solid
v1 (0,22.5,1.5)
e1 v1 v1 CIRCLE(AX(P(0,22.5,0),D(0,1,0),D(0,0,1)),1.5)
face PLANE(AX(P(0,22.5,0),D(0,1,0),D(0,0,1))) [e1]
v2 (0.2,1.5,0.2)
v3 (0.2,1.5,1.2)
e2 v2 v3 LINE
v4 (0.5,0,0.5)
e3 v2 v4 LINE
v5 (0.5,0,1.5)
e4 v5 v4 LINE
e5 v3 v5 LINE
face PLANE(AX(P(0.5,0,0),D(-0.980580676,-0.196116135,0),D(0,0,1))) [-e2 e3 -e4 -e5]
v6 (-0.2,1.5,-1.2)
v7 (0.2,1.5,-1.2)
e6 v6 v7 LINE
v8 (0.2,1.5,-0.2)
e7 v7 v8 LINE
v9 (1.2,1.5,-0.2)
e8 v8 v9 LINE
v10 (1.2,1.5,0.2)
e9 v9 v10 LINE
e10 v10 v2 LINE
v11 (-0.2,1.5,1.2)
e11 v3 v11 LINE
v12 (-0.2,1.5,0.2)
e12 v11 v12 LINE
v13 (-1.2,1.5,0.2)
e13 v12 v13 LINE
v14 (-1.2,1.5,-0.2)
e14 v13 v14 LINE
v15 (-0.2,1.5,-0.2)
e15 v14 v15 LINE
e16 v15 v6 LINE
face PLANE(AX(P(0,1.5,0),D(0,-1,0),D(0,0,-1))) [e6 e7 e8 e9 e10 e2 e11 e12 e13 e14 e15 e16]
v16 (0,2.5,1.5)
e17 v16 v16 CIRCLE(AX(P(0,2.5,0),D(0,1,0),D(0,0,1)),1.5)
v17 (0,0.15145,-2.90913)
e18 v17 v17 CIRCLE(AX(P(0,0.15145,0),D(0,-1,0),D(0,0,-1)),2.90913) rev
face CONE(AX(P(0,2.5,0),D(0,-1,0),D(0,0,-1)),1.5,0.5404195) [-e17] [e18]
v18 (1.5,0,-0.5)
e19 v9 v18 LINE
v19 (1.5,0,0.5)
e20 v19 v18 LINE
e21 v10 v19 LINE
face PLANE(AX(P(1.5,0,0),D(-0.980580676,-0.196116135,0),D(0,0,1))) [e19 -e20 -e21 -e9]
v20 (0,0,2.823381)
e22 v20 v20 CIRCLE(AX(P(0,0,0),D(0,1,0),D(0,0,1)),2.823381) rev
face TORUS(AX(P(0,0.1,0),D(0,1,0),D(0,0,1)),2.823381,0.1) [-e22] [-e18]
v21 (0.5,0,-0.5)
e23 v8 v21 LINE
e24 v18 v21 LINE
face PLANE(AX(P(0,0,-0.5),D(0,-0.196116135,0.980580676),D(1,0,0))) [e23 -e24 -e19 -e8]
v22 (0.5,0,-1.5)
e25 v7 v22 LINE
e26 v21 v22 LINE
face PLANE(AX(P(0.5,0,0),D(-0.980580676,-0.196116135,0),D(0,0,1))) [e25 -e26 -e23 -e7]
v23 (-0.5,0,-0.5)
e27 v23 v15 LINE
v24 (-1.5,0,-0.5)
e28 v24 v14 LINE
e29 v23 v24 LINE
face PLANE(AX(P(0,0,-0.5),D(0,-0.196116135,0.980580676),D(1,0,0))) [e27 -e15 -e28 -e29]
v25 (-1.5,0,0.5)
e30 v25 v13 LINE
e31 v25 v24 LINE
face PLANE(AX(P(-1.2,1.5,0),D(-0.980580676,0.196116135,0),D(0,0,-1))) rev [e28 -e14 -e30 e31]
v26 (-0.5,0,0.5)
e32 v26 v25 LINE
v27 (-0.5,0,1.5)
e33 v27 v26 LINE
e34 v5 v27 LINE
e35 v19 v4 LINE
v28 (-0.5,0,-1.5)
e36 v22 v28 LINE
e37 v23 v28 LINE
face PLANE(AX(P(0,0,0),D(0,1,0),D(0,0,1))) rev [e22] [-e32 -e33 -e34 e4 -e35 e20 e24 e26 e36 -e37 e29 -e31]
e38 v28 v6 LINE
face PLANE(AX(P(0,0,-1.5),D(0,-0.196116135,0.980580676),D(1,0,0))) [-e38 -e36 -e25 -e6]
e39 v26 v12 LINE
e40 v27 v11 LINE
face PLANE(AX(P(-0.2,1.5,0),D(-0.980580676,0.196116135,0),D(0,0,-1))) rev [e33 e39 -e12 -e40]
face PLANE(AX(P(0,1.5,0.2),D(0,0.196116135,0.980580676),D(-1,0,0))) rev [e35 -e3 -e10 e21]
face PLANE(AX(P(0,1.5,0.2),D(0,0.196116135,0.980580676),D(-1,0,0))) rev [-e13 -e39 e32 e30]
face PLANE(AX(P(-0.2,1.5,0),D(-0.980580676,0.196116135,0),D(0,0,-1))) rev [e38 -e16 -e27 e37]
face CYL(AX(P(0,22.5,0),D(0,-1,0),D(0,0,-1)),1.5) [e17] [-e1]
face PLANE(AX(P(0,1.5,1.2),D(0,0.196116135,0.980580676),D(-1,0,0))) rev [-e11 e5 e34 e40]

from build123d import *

# Parameters (mm, degrees)
SKETCH1_R           = 3
BOSS_EXTRUDE1_DEPTH = 2.5
SKETCH2_R           = 1.5
BOSS_EXTRUDE2_DEPTH = 20
CHAMFER1_SIZE       = 2.5
CHAMFER1_SIZE_2     = 1.5
FILLET1_R           = 0.1
SKETCH3_W           = 1
SKETCH3_H           = 1
CUT_EXTRUDE2_DEPTH  = 1.5
CHAMFER7_SIZE       = 1.5
CHAMFER7_SIZE_2     = 0.3


with BuildPart() as part:
    # Sketch1 → Boss-Extrude1 (new body)
    with BuildSketch(Plane(origin=(0, 0, 0), x_dir=(1, 0, 0), z_dir=(0, 1, 0))):
        with Locations(Location((0, 0, 0), (0, 0, 270))):
            Circle(SKETCH1_R)
    extrude(amount=BOSS_EXTRUDE1_DEPTH)

    # Sketch2 → Boss-Extrude2 (add)
    with BuildSketch(Plane(origin=(0, 2.5, 0), x_dir=(1, 0, 0), z_dir=(0, 1, 0))):
        with Locations(Location((0, 0, 0), (0, 0, 270))):
            Circle(SKETCH2_R)
    extrude(amount=BOSS_EXTRUDE2_DEPTH)

    # Chamfer1
    # the kernel refuses this chamfer: 2.5, 1.5 mm, written as the material it takes off along each edge
    with BuildSketch(Plane(origin=(0, 2.5, 0), x_dir=(0, 0, 1), z_dir=(-1, 0, 0))) as chamfer1_piece_1_section:
        Polygon((3, -CHAMFER1_SIZE), (3 - CHAMFER1_SIZE_2, 0), (3, 0), align=None)
    chamfer1_piece_1 = revolve(axis=Axis((0, 2.5, 0), (0, 1, 0)), mode=Mode.PRIVATE)
    chamfer1_piece_1 = chamfer1_piece_1 - Plane(origin=(0, 2.5, 0), x_dir=(0, 0, 1), z_dir=(0, -1, 0)) * Cylinder(1.5, 12, mode=Mode.PRIVATE)
    add(chamfer1_piece_1, mode=Mode.SUBTRACT)

    # Fillet1
    fillet1_edges = [part.edges().sort_by_distance(p)[0] for p in [
        (0, 0, -3),
    ]]
    fillet(fillet1_edges, radius=FILLET1_R)

    # Sketch3 → Cut-Extrude2 (cut)
    with BuildSketch(Plane.XZ):
        with Locations((0, -1)):
            Rectangle(SKETCH3_W, SKETCH3_H)
        with Locations((-1, 0)):
            Rectangle(SKETCH3_W, SKETCH3_H)
        Rectangle(SKETCH3_W, SKETCH3_H)
        with Locations((0, 1)):
            Rectangle(SKETCH3_W, SKETCH3_H)
        with Locations((1, 0)):
            Rectangle(SKETCH3_W, SKETCH3_H)
    extrude(amount=-CUT_EXTRUDE2_DEPTH, mode=Mode.SUBTRACT)

    # Chamfer7
    # the kernel refuses this chamfer: 1.5, 0.3 mm, written as the material it adds along each edge
    with BuildSketch(Plane(origin=(-0.5, 1.5, -1.5), x_dir=(0, -1, 0), z_dir=(1, 0, 0)), Plane(origin=(0.5, 1.5, 1.5), x_dir=(0, -1, 0), z_dir=(-1, 0, 0)), Plane(origin=(1.5, 1.5, 0.5), x_dir=(0, -1, 0), z_dir=(-1, 0, 0)), Plane(origin=(-0.5, 1.5, 1.5), x_dir=(0, -1, 0), z_dir=(0, 0, -1)), Plane(origin=(-1.5, 1.5, 0.5), x_dir=(0, -1, 0), z_dir=(0, 0, -1)), Plane(origin=(1.5, 1.5, -0.5), x_dir=(0, -1, 0), z_dir=(0, 0, 1)), Plane(origin=(0.5, 1.5, -0.5), x_dir=(0, -1, 0), z_dir=(1, 0, 0)), Plane(origin=(-1.5, 1.5, -0.5), x_dir=(0, -1, 0), z_dir=(1, 0, 0)), Plane(origin=(-0.5, 1.5, -0.5), x_dir=(0, -1, 0), z_dir=(0, 0, -1))) as chamfer7_piece_1:
        Polygon((CHAMFER7_SIZE, 0), (0, -CHAMFER7_SIZE_2), (0, 0), align=None)
    extrude(amount=1)
    with BuildSketch(Plane(origin=(0.5, 1.5, 1.5), x_dir=(0, -1, 0), z_dir=(0, 0, -1)), Plane(origin=(-1.5, 1.5, 0.5), x_dir=(0, -1, 0), z_dir=(1, 0, 0)), Plane(origin=(0.5, 1.5, -0.5), x_dir=(0, -1, 0), z_dir=(0, 0, -1))) as chamfer7_piece_2:
        Polygon((CHAMFER7_SIZE, 0), (0, CHAMFER7_SIZE_2), (0, 0), align=None)
    extrude(amount=1)
    with BuildSketch(Plane(origin=(0.5, 1.5, 5.397198129), x_dir=(0, -1, 0), z_dir=(0, 0, -1))) as chamfer7_piece_3_section:
        Polygon((CHAMFER7_SIZE, 0), (0, CHAMFER7_SIZE_2), (0, 0), align=None)
    chamfer7_piece_3 = extrude(amount=8.794396259, mode=Mode.PRIVATE)
    chamfer7_piece_3 = split(chamfer7_piece_3, bisect_by=Plane(origin=(0.5, 1.5, -0.5), z_dir=(0, 0, -1)), keep=Keep.TOP, mode=Mode.PRIVATE)
    chamfer7_piece_3 = split(chamfer7_piece_3, bisect_by=Plane(origin=(0.5, 1.5, -1.5), z_dir=(0, 0, 1)), keep=Keep.TOP, mode=Mode.PRIVATE)
    add(chamfer7_piece_3)
    with BuildSketch(Plane(origin=(5.397198129, 1.5, 0.5), x_dir=(0, -1, 0), z_dir=(-1, 0, 0))) as chamfer7_piece_4_section:
        Polygon((CHAMFER7_SIZE, 0), (0, -CHAMFER7_SIZE_2), (0, 0), align=None)
    chamfer7_piece_4 = extrude(amount=8.794396259, mode=Mode.PRIVATE)
    chamfer7_piece_4 = split(chamfer7_piece_4, bisect_by=Plane(origin=(-1.5, 1.5, 0.5), z_dir=(1, 0, 0)), keep=Keep.TOP, mode=Mode.PRIVATE)
    chamfer7_piece_4 = split(chamfer7_piece_4, bisect_by=Plane(origin=(-0.5, 1.5, 0.5), z_dir=(-1, 0, 0)), keep=Keep.TOP, mode=Mode.PRIVATE)
    add(chamfer7_piece_4)
    with BuildSketch(Plane(origin=(-0.5, 1.5, 5.397198129), x_dir=(0, -1, 0), z_dir=(0, 0, -1))) as chamfer7_piece_5_section:
        Polygon((CHAMFER7_SIZE, 0), (0, -CHAMFER7_SIZE_2), (0, 0), align=None)
    chamfer7_piece_5 = extrude(amount=8.794396259, mode=Mode.PRIVATE)
    chamfer7_piece_5 = split(chamfer7_piece_5, bisect_by=Plane(origin=(-0.5, 1.5, -0.5), z_dir=(0, 0, -1)), keep=Keep.TOP, mode=Mode.PRIVATE)
    chamfer7_piece_5 = split(chamfer7_piece_5, bisect_by=Plane(origin=(-0.5, 1.5, -1.5), z_dir=(0, 0, 1)), keep=Keep.TOP, mode=Mode.PRIVATE)
    add(chamfer7_piece_5)
    with BuildSketch(Plane(origin=(-5.397198129, 1.5, 0.5), x_dir=(0, -1, 0), z_dir=(1, 0, 0))) as chamfer7_piece_6_section:
        Polygon((CHAMFER7_SIZE, 0), (0, CHAMFER7_SIZE_2), (0, 0), align=None)
    chamfer7_piece_6 = extrude(amount=8.794396259, mode=Mode.PRIVATE)
    chamfer7_piece_6 = split(chamfer7_piece_6, bisect_by=Plane(origin=(0.5, 1.5, 0.5), z_dir=(1, 0, 0)), keep=Keep.TOP, mode=Mode.PRIVATE)
    chamfer7_piece_6 = split(chamfer7_piece_6, bisect_by=Plane(origin=(1.5, 1.5, 0.5), z_dir=(-1, 0, 0)), keep=Keep.TOP, mode=Mode.PRIVATE)
    add(chamfer7_piece_6)
    with BuildSketch(Plane(origin=(-3.397198129, 1.5, -0.5), x_dir=(0, -1, 0), z_dir=(1, 0, 0))) as chamfer7_piece_7_section:
        Polygon((CHAMFER7_SIZE, 0), (0, -CHAMFER7_SIZE_2), (0, 0), align=None)
    chamfer7_piece_7 = extrude(amount=8.794396259, mode=Mode.PRIVATE)
    chamfer7_piece_7 = split(chamfer7_piece_7, bisect_by=Plane(origin=(-1.5, 1.5, -0.5), z_dir=(1, 0, 0)), keep=Keep.TOP, mode=Mode.PRIVATE)
    chamfer7_piece_7 = split(chamfer7_piece_7, bisect_by=Plane(origin=(-0.5, 1.5, -0.5), z_dir=(-1, 0, 0)), keep=Keep.TOP, mode=Mode.PRIVATE)
    add(chamfer7_piece_7)
    with BuildSketch(Plane(origin=(0.5, 1.5, 3.397198129), x_dir=(0, -1, 0), z_dir=(0, 0, -1))) as chamfer7_piece_8_section:
        Polygon((CHAMFER7_SIZE, 0), (0, CHAMFER7_SIZE_2), (0, 0), align=None)
    chamfer7_piece_8 = extrude(amount=8.794396259, mode=Mode.PRIVATE)
    chamfer7_piece_8 = split(chamfer7_piece_8, bisect_by=Plane(origin=(0.5, 1.5, 1.5), z_dir=(0, 0, -1)), keep=Keep.TOP, mode=Mode.PRIVATE)
    chamfer7_piece_8 = split(chamfer7_piece_8, bisect_by=Plane(origin=(0.5, 1.5, 0.5), z_dir=(0, 0, 1)), keep=Keep.TOP, mode=Mode.PRIVATE)
    add(chamfer7_piece_8)
    with BuildSketch(Plane(origin=(-5.397198129, 1.5, -0.5), x_dir=(0, -1, 0), z_dir=(1, 0, 0))) as chamfer7_piece_9_section:
        Polygon((CHAMFER7_SIZE, 0), (0, -CHAMFER7_SIZE_2), (0, 0), align=None)
    chamfer7_piece_9 = extrude(amount=8.794396259, mode=Mode.PRIVATE)
    chamfer7_piece_9 = split(chamfer7_piece_9, bisect_by=Plane(origin=(1.5, 1.5, -0.5), z_dir=(-1, 0, 0)), keep=Keep.TOP, mode=Mode.PRIVATE)
    chamfer7_piece_9 = split(chamfer7_piece_9, bisect_by=Plane(origin=(0.5, 1.5, -0.5), z_dir=(1, 0, 0)), keep=Keep.TOP, mode=Mode.PRIVATE)
    add(chamfer7_piece_9)
    with BuildSketch(Plane(origin=(-0.5, 1.5, 3.397198129), x_dir=(0, -1, 0), z_dir=(0, 0, -1))) as chamfer7_piece_10_section:
        Polygon((CHAMFER7_SIZE, 0), (0, -CHAMFER7_SIZE_2), (0, 0), align=None)
    chamfer7_piece_10 = extrude(amount=8.794396259, mode=Mode.PRIVATE)
    chamfer7_piece_10 = split(chamfer7_piece_10, bisect_by=Plane(origin=(-0.5, 1.5, 0.5), z_dir=(0, 0, 1)), keep=Keep.TOP, mode=Mode.PRIVATE)
    chamfer7_piece_10 = split(chamfer7_piece_10, bisect_by=Plane(origin=(-0.5, 1.5, 1.5), z_dir=(0, 0, -1)), keep=Keep.TOP, mode=Mode.PRIVATE)
    add(chamfer7_piece_10)
    with BuildSketch(Plane(origin=(0.5, 1.5, 1.5), x_dir=(0, -1, 0), z_dir=(0, 0, -1))) as chamfer7_piece_11a_section:
        Polygon((CHAMFER7_SIZE, 0), (0, CHAMFER7_SIZE_2), (0, 0), align=None)
    chamfer7_piece_11a = extrude(amount=4.897198129, mode=Mode.PRIVATE)
    chamfer7_piece_11a = split(chamfer7_piece_11a, bisect_by=Plane(origin=(0.5, 1.5, 0.5), z_dir=(0, 0, -1)), keep=Keep.TOP, mode=Mode.PRIVATE)
    chamfer7_piece_11a = split(chamfer7_piece_11a, bisect_by=Plane(origin=(0.5, 1.5, -0.5), z_dir=(0, 0, 1)), keep=Keep.TOP, mode=Mode.PRIVATE)
    with BuildSketch(Plane(origin=(1.5, 1.5, 0.5), x_dir=(0, -1, 0), z_dir=(-1, 0, 0))) as chamfer7_piece_11b_section:
        Polygon((CHAMFER7_SIZE, 0), (0, -CHAMFER7_SIZE_2), (0, 0), align=None)
    chamfer7_piece_11b = extrude(amount=4.897198129, mode=Mode.PRIVATE)
    chamfer7_piece_11b = split(chamfer7_piece_11b, bisect_by=Plane(origin=(-0.5, 1.5, 0.5), z_dir=(1, 0, 0)), keep=Keep.TOP, mode=Mode.PRIVATE)
    chamfer7_piece_11b = split(chamfer7_piece_11b, bisect_by=Plane(origin=(0.5, 1.5, 0.5), z_dir=(-1, 0, 0)), keep=Keep.TOP, mode=Mode.PRIVATE)
    chamfer7_piece_11 = chamfer7_piece_11a & chamfer7_piece_11b
    add(chamfer7_piece_11)
    with BuildSketch(Plane(origin=(-1.5, 1.5, 0.5), x_dir=(0, -1, 0), z_dir=(1, 0, 0))) as chamfer7_piece_12a_section:
        Polygon((CHAMFER7_SIZE, 0), (0, CHAMFER7_SIZE_2), (0, 0), align=None)
    chamfer7_piece_12a = extrude(amount=4.897198129, mode=Mode.PRIVATE)
    chamfer7_piece_12a = split(chamfer7_piece_12a, bisect_by=Plane(origin=(-0.5, 1.5, 0.5), z_dir=(1, 0, 0)), keep=Keep.TOP, mode=Mode.PRIVATE)
    chamfer7_piece_12a = split(chamfer7_piece_12a, bisect_by=Plane(origin=(0.5, 1.5, 0.5), z_dir=(-1, 0, 0)), keep=Keep.TOP, mode=Mode.PRIVATE)
    with BuildSketch(Plane(origin=(-0.5, 1.5, 1.5), x_dir=(0, -1, 0), z_dir=(0, 0, -1))) as chamfer7_piece_12b_section:
        Polygon((CHAMFER7_SIZE, 0), (0, -CHAMFER7_SIZE_2), (0, 0), align=None)
    chamfer7_piece_12b = extrude(amount=4.897198129, mode=Mode.PRIVATE)
    chamfer7_piece_12b = split(chamfer7_piece_12b, bisect_by=Plane(origin=(-0.5, 1.5, -0.5), z_dir=(0, 0, 1)), keep=Keep.TOP, mode=Mode.PRIVATE)
    chamfer7_piece_12b = split(chamfer7_piece_12b, bisect_by=Plane(origin=(-0.5, 1.5, 0.5), z_dir=(0, 0, -1)), keep=Keep.TOP, mode=Mode.PRIVATE)
    chamfer7_piece_12 = chamfer7_piece_12a & chamfer7_piece_12b
    add(chamfer7_piece_12)
    with BuildSketch(Plane(origin=(-3.397198129, 1.5, -0.5), x_dir=(0, -1, 0), z_dir=(1, 0, 0))) as chamfer7_piece_13a_section:
        Polygon((CHAMFER7_SIZE, 0), (0, -CHAMFER7_SIZE_2), (0, 0), align=None)
    chamfer7_piece_13a = extrude(amount=4.897198129, mode=Mode.PRIVATE)
    chamfer7_piece_13a = split(chamfer7_piece_13a, bisect_by=Plane(origin=(0.5, 1.5, -0.5), z_dir=(-1, 0, 0)), keep=Keep.TOP, mode=Mode.PRIVATE)
    chamfer7_piece_13a = split(chamfer7_piece_13a, bisect_by=Plane(origin=(-0.5, 1.5, -0.5), z_dir=(1, 0, 0)), keep=Keep.TOP, mode=Mode.PRIVATE)
    with BuildSketch(Plane(origin=(0.5, 1.5, 3.397198129), x_dir=(0, -1, 0), z_dir=(0, 0, -1))) as chamfer7_piece_13b_section:
        Polygon((CHAMFER7_SIZE, 0), (0, CHAMFER7_SIZE_2), (0, 0), align=None)
    chamfer7_piece_13b = extrude(amount=4.897198129, mode=Mode.PRIVATE)
    chamfer7_piece_13b = split(chamfer7_piece_13b, bisect_by=Plane(origin=(0.5, 1.5, 0.5), z_dir=(0, 0, -1)), keep=Keep.TOP, mode=Mode.PRIVATE)
    chamfer7_piece_13b = split(chamfer7_piece_13b, bisect_by=Plane(origin=(0.5, 1.5, -0.5), z_dir=(0, 0, 1)), keep=Keep.TOP, mode=Mode.PRIVATE)
    chamfer7_piece_13 = chamfer7_piece_13a & chamfer7_piece_13b
    add(chamfer7_piece_13)
    with BuildSketch(Plane(origin=(-1.5, 1.5, -0.5), x_dir=(0, -1, 0), z_dir=(1, 0, 0))) as chamfer7_piece_14a_section:
        Polygon((CHAMFER7_SIZE, 0), (0, -CHAMFER7_SIZE_2), (0, 0), align=None)
    chamfer7_piece_14a = extrude(amount=4.897198129, mode=Mode.PRIVATE)
    chamfer7_piece_14a = split(chamfer7_piece_14a, bisect_by=Plane(origin=(0.5, 1.5, -0.5), z_dir=(-1, 0, 0)), keep=Keep.TOP, mode=Mode.PRIVATE)
    chamfer7_piece_14a = split(chamfer7_piece_14a, bisect_by=Plane(origin=(-0.5, 1.5, -0.5), z_dir=(1, 0, 0)), keep=Keep.TOP, mode=Mode.PRIVATE)
    with BuildSketch(Plane(origin=(-0.5, 1.5, 3.397198129), x_dir=(0, -1, 0), z_dir=(0, 0, -1))) as chamfer7_piece_14b_section:
        Polygon((CHAMFER7_SIZE, 0), (0, -CHAMFER7_SIZE_2), (0, 0), align=None)
    chamfer7_piece_14b = extrude(amount=4.897198129, mode=Mode.PRIVATE)
    chamfer7_piece_14b = split(chamfer7_piece_14b, bisect_by=Plane(origin=(-0.5, 1.5, -0.5), z_dir=(0, 0, 1)), keep=Keep.TOP, mode=Mode.PRIVATE)
    chamfer7_piece_14b = split(chamfer7_piece_14b, bisect_by=Plane(origin=(-0.5, 1.5, 0.5), z_dir=(0, 0, -1)), keep=Keep.TOP, mode=Mode.PRIVATE)
    chamfer7_piece_14 = chamfer7_piece_14a & chamfer7_piece_14b
    add(chamfer7_piece_14)


solid = part.part
